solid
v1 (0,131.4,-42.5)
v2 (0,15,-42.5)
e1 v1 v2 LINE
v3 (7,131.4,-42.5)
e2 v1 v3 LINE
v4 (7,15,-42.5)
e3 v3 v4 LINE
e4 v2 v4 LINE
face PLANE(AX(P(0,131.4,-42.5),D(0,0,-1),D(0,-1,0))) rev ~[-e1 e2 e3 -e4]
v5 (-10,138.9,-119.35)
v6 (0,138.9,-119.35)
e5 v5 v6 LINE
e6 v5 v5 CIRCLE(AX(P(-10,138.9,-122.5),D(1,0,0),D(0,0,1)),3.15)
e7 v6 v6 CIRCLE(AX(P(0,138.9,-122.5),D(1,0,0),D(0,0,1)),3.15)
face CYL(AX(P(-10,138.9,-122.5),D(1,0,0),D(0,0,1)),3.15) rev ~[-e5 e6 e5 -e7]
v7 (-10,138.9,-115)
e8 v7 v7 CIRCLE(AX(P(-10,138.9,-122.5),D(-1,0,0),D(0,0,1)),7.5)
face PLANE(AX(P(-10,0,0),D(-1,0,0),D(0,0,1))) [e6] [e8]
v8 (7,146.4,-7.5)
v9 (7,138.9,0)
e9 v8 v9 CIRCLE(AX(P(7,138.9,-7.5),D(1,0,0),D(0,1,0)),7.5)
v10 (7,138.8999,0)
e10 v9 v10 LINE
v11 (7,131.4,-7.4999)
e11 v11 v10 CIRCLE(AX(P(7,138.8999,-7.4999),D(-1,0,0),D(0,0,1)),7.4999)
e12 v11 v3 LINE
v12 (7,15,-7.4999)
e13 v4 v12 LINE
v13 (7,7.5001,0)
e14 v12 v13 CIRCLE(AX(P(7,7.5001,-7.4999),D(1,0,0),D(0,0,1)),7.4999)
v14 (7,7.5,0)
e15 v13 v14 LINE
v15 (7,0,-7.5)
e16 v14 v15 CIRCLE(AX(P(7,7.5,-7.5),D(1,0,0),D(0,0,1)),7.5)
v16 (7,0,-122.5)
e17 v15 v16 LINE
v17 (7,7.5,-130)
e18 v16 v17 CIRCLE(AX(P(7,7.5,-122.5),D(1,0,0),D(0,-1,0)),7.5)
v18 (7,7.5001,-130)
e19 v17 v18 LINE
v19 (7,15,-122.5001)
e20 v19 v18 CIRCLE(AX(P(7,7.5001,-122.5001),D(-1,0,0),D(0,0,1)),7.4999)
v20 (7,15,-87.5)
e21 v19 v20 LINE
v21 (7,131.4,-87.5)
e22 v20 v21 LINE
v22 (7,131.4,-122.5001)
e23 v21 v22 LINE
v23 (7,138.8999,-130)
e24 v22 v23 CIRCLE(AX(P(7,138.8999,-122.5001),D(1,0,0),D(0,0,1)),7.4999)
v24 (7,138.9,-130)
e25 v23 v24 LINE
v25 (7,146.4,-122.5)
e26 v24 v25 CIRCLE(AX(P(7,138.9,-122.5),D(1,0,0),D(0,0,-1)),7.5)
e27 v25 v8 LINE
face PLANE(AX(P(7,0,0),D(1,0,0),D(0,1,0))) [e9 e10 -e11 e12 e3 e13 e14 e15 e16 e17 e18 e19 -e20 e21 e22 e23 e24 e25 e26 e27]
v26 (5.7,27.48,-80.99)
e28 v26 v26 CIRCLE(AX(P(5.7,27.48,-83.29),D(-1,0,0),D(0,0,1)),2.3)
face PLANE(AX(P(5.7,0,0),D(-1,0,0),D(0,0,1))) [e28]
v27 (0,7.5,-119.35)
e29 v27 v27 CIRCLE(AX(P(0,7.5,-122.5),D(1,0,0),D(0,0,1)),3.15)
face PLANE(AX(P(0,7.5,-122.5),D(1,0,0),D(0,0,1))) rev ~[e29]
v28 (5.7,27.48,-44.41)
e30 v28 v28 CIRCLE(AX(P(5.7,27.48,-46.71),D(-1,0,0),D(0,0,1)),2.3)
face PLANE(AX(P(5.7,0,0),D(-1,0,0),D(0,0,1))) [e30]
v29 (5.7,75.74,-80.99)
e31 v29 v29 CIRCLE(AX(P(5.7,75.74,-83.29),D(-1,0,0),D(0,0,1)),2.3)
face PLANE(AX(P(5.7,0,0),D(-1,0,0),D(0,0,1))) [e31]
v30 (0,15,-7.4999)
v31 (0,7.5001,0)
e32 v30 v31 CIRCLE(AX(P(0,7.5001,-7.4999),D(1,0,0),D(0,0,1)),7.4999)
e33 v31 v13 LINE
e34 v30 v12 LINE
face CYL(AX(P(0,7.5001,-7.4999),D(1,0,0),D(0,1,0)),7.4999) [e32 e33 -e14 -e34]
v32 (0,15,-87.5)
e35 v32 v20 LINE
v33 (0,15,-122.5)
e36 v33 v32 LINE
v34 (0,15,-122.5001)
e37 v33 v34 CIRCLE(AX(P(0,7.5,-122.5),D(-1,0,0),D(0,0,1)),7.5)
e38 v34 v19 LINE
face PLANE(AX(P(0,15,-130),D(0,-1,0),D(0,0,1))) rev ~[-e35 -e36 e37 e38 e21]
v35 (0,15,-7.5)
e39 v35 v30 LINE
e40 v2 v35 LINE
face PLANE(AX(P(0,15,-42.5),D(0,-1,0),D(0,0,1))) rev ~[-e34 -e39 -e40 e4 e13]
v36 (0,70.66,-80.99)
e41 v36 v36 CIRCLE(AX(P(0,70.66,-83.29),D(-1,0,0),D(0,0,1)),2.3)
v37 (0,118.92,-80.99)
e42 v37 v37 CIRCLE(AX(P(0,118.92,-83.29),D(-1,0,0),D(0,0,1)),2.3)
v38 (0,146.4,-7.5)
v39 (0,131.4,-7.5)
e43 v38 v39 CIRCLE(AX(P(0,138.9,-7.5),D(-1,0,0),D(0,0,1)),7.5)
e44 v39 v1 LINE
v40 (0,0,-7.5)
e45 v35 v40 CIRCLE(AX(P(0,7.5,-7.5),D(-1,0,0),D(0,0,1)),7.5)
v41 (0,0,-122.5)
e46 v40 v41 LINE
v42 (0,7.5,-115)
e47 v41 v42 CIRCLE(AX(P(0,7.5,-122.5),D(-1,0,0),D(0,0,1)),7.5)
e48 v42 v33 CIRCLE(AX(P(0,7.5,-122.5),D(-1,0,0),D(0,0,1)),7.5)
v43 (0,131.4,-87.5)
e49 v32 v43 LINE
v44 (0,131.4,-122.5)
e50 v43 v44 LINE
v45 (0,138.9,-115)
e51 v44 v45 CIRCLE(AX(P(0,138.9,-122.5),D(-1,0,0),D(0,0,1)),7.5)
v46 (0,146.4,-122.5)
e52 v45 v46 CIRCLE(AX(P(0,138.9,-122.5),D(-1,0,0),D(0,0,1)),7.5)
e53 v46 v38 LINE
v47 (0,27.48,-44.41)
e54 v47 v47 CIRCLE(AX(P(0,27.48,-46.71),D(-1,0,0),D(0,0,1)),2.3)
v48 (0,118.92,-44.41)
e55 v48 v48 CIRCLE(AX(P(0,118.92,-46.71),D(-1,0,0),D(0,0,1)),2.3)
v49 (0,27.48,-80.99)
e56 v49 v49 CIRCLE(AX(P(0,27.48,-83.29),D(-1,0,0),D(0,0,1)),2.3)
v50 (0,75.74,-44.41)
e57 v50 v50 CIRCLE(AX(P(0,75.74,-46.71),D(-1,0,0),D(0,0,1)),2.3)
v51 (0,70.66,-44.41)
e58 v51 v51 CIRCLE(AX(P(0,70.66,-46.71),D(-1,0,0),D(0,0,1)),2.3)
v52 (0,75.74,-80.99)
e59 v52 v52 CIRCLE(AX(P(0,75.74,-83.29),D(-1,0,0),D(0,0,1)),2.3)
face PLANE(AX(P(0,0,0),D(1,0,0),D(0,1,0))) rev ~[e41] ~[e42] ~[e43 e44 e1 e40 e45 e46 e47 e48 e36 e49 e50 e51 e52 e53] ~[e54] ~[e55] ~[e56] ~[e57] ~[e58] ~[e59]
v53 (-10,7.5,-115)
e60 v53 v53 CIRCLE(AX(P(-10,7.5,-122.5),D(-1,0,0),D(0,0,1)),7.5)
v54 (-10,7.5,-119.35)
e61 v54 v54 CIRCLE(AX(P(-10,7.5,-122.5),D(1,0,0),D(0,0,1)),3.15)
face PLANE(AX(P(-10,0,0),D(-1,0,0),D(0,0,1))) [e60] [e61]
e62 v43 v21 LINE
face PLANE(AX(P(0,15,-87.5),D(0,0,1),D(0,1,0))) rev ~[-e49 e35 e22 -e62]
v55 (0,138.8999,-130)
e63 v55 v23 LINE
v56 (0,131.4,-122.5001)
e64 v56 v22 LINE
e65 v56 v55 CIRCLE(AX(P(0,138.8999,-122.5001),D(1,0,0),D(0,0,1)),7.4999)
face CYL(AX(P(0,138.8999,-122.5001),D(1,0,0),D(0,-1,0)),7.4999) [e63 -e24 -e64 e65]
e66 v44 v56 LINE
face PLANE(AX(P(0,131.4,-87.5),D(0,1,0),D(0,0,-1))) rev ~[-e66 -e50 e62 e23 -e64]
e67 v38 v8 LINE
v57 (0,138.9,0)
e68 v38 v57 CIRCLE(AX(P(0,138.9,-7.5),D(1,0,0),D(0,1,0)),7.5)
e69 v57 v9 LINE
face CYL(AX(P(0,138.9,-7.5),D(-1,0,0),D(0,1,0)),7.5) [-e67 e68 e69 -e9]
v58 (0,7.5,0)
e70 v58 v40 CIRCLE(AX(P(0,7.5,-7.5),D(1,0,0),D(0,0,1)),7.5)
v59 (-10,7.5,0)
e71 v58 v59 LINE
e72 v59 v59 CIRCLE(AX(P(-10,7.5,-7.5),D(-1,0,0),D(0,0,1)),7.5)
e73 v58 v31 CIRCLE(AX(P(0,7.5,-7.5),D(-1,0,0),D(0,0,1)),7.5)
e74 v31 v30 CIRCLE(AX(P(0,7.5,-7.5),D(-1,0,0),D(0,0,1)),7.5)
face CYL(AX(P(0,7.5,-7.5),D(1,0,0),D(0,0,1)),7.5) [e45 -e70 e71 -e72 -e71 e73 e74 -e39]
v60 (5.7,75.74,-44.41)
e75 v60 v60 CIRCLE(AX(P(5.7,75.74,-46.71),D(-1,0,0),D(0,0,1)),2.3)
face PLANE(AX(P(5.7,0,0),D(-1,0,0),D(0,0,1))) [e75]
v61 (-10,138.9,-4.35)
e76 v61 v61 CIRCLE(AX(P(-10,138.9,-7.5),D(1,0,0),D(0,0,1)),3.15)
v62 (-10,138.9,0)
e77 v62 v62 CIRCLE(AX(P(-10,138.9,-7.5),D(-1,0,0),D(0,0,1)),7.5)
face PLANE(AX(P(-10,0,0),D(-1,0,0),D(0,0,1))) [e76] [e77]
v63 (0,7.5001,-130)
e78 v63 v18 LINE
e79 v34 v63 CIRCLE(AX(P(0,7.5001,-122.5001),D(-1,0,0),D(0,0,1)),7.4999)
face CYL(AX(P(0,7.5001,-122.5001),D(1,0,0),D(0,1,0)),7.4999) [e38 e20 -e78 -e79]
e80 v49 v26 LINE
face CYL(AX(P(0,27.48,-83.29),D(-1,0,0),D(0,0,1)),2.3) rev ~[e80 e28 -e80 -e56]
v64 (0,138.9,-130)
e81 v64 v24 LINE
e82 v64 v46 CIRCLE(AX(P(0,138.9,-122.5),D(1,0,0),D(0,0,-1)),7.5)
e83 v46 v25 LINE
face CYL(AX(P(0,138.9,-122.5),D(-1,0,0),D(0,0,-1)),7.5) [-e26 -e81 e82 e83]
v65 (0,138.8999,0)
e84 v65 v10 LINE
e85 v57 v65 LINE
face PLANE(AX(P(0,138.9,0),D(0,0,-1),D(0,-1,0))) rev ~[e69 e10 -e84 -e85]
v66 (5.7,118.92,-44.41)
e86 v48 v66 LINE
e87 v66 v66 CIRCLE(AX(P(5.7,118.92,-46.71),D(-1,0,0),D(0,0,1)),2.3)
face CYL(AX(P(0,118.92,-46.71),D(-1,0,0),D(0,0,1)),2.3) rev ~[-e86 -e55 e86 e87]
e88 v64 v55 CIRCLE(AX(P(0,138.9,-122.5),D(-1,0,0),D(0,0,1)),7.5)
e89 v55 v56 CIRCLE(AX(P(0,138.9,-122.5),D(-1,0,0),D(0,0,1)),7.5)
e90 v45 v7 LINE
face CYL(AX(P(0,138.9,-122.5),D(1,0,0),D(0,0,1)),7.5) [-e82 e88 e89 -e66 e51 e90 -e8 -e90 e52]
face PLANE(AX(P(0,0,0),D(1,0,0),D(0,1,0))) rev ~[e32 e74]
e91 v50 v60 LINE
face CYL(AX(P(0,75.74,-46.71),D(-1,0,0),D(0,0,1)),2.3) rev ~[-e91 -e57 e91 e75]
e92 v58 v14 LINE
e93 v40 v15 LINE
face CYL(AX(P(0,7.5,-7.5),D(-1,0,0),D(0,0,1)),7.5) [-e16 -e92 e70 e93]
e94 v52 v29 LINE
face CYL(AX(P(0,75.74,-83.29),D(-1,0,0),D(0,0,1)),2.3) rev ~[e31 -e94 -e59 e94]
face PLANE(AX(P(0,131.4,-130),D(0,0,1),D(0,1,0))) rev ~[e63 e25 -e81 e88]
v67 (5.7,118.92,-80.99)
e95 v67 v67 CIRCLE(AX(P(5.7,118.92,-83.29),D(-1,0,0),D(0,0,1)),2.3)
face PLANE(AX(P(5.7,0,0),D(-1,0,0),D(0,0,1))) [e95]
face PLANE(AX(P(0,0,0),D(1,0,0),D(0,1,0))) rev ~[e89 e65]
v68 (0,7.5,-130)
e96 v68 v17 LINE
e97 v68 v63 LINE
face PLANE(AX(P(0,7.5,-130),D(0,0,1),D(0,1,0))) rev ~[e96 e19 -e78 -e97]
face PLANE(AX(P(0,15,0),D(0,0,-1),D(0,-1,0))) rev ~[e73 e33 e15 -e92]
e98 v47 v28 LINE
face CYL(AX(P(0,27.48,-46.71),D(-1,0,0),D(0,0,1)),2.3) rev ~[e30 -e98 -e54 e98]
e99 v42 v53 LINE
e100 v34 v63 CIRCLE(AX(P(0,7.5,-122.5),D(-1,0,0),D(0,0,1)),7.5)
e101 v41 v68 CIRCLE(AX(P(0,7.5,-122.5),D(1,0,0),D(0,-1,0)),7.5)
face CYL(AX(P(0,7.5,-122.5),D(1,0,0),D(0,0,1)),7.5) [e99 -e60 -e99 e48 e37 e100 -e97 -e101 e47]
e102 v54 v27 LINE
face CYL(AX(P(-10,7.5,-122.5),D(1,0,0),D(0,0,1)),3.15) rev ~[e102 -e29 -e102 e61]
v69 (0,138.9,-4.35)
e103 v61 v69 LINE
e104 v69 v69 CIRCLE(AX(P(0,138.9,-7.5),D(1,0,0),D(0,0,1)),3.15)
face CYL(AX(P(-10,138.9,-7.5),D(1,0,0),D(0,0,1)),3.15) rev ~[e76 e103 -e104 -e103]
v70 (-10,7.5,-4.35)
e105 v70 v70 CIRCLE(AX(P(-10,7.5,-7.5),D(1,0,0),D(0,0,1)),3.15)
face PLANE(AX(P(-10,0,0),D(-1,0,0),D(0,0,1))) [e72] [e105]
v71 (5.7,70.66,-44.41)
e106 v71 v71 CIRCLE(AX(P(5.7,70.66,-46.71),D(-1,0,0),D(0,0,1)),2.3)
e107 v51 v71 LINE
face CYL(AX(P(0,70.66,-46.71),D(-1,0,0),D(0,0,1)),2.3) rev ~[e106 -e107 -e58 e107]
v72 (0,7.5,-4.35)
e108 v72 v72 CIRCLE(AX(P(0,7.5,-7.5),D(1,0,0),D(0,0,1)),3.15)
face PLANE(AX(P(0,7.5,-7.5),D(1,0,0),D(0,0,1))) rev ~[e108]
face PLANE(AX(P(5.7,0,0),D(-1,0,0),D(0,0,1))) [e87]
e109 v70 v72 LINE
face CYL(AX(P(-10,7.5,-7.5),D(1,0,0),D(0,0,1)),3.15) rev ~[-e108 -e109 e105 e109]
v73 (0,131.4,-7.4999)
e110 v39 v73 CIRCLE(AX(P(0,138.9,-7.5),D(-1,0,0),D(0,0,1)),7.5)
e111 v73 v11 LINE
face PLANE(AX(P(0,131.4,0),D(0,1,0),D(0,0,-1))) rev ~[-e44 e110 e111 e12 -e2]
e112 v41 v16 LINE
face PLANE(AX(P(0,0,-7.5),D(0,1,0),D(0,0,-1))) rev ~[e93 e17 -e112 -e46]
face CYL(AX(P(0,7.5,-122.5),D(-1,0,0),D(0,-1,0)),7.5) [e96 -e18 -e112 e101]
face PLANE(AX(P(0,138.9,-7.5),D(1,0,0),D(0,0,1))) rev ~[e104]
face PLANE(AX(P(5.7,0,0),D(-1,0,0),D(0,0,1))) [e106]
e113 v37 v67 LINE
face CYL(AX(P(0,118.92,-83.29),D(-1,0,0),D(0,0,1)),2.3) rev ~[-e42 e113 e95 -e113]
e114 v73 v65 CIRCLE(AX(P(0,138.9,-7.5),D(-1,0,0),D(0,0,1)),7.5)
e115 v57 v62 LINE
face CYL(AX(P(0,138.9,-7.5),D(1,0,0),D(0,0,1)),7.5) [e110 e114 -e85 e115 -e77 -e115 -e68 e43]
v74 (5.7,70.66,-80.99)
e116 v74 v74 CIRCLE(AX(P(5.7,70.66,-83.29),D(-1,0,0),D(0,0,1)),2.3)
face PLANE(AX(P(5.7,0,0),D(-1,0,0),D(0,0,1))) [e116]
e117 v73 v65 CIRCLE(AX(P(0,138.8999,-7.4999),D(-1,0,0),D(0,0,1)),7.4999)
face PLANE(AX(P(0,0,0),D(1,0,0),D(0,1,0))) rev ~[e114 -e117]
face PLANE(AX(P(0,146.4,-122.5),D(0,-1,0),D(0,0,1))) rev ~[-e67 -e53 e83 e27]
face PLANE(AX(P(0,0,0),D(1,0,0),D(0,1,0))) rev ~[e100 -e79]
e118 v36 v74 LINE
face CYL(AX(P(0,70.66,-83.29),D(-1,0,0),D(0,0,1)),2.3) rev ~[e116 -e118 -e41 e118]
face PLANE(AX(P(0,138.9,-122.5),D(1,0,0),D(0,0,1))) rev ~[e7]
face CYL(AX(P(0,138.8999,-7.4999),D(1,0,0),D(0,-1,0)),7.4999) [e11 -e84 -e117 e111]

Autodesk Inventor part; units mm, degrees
ref_plane "YZ Plane" through (0, 0, 0) normal (1, 0, 0) x (0, 1, 0)
ref_plane "XZ Plane" through (0, 0, 0) normal (0, 1, 0) x (-1, 0, 0)
ref_plane "XY Plane" through (0, 0, 0) normal (0, 0, 1) x (1, 0, 0)
sketch "Esquisse1" plane through (0, 0, 0) normal (1, 0, 0) x (0, 1, 0)
  line L0 (7.5, 0) -> (138.9, 0)
  line L1 (146.4, -7.5) -> (146.4, -122.5)
  line L2 (138.9, -130) -> (7.5, -130)
  line L3 (0, -122.5) -> (0, -7.5)
  arc A0 (138.9, -130) -> (146.4, -122.5) centre (138.9, -122.5) ccw
  arc A1 (0, -122.5) -> (7.5, -130) centre (7.5, -122.5) ccw
  arc A2 (7.5, 0) -> (0, -7.5) centre (7.5, -7.5) ccw
  arc A3 (146.4, -7.5) -> (138.9, 0) centre (138.9, -7.5) ccw
  line L4 (15, -42.5) -> (131.4, -42.5)
  line L5 (131.4, -42.5) -> (131.4, -87.5)
  line L6 (131.4, -87.5) -> (15, -87.5)
  line L7 (15, -87.5) -> (15, -42.5)
  circle A4 centre (138.9, -122.5) radius 7.5
  line L8 (15, -42.5) -> (15, 0)
  line L9 (15, -87.5) -> (15, -130)
  line L10 (131.4, -87.5) -> (131.4, -130)
  line L11 (131.4, -42.5) -> (131.4, 0)
  circle A5 centre (7.5, -122.5) radius 7.5
  circle A6 centre (138.9, -7.5) radius 7.5
  circle A7 centre (7.5, -7.5) radius 7.5
  point P0 (0, 0)
  point P1 (146.4, -130)
  point P2 (146.4, 0)
  point P3 (0, -130)
  point P4 (73.2, -87.5)
  dimension "d0" = 146.4
  dimension "d1" = 130
  dimension "d2" = 7.5
  dimension "d3" = 7.5
  dimension "d4" = 116.4
  dimension "d5" = 45
  dimension "d11" = 42.5
  dimension "d12" = 42.5
  dimension "d13" = 15
  dimension "d104" = 131.4
  dimension "d107" = 115
sketch "Esquisse1 outline for Extrusion1" plane through (0, 0, 0) normal (1, 0, 0) x (0, 1, 0)
  line L0 (15, -87.5) -> (131.4, -87.5)
  line L1 (15, -130) -> (15, -87.5)
  line L2 (7.5, -130) -> (15, -130)
  arc A0 (0, -122.5) -> (7.5, -130) centre (7.5, -122.5) ccw
  line L3 (0, -7.5) -> (0, -122.5)
  arc A1 (7.5, 0) -> (0, -7.5) centre (7.5, -7.5) ccw
  line L4 (15, 0) -> (7.5, 0)
  line L5 (15, -42.5) -> (15, 0)
  line L6 (131.4, -42.5) -> (15, -42.5)
  line L7 (131.4, 0) -> (131.4, -42.5)
  line L8 (138.9, 0) -> (131.4, 0)
  arc A2 (146.4, -7.5) -> (138.9, 0) centre (138.9, -7.5) ccw
  line L9 (146.4, -122.5) -> (146.4, -7.5)
  arc A3 (138.9, -130) -> (146.4, -122.5) centre (138.9, -122.5) ccw
  line L10 (131.4, -130) -> (138.9, -130)
  line L11 (131.4, -87.5) -> (131.4, -130)
extrude "Extrusion1" add sketch "Esquisse1 outline for Extrusion1" along normal blind 7
sketch "Esquisse2" plane through (0, 0, 0) normal (-1, 0, 0) x (0, 0, 1)
  line L0 (-46.71, 27.48) -> (-83.29, 27.48)
  line L1 (-83.29, 27.48) -> (-83.29, 70.66)
  line L2 (-83.29, 70.66) -> (-46.71, 70.66)
  line L3 (-46.71, 70.66) -> (-46.71, 27.48)
  line L4 (-46.71, 75.74) -> (-83.29, 75.74)
  line L5 (-83.29, 75.74) -> (-83.29, 118.92)
  line L6 (-83.29, 118.92) -> (-46.71, 118.92)
  line L7 (-46.71, 118.92) -> (-46.71, 75.74)
  line L8 (-42.5, 131.4) -> (-42.5, 15) projected
  line L9 (-87.5, 15) -> (-87.5, 131.4) projected
  circle A0 centre (-83.29, 27.48) radius 2.3
  circle A1 centre (-46.71, 27.48) radius 2.3
  circle A2 centre (-46.71, 70.66) radius 2.3
  circle A3 centre (-83.29, 70.66) radius 2.3
  circle A4 centre (-83.29, 75.74) radius 2.3
  circle A5 centre (-46.71, 75.74) radius 2.3
  circle A6 centre (-46.71, 118.92) radius 2.3
  circle A7 centre (-83.29, 118.92) radius 2.3
  line L10 (-7.5, 0) -> (-122.5, 0) projected
  line L11 (-122.5, 146.4) -> (-7.5, 146.4) projected
  point P0 (0, 0)
  point P1 (-83.29, 49.07)
  dimension "d8" = 36.58
  dimension "d9" = 43.18
  dimension "d10" = 43.18
  dimension "d14" = 4.21
  dimension "d15" = 4.21
  dimension "d16" = 5.08
  dimension "d17" = 4.6
  dimension "d18" = 4.6
  dimension "d19" = 4.6
  dimension "d20" = 4.6
  dimension "d21" = 4.6
  dimension "d22" = 4.6
  dimension "d23" = 4.6
  dimension "d24" = 4.6
  dimension "d110" = 27.48
  dimension "d111" = 27.48
sketch "Esquisse2 outline for Extrusion2" plane through (0, 0, 0) normal (-1, 0, 0) x (0, 0, 1)
  circle A0 centre (-46.71, 118.92) radius 2.3
  circle A1 centre (-83.29, 118.92) radius 2.3
  circle A2 centre (-83.29, 75.74) radius 2.3
  circle A3 centre (-46.71, 75.74) radius 2.3
  circle A4 centre (-83.29, 70.66) radius 2.3
  circle A5 centre (-46.71, 70.66) radius 2.3
  circle A6 centre (-46.71, 27.48) radius 2.3
  circle A7 centre (-83.29, 27.48) radius 2.3
extrude "Extrusion2" cut sketch "Esquisse2 outline for Extrusion2" against normal blind 5.7
sketch "Esquisse3" plane through (0, 0, 0) normal (-1, 0, 0) x (0, 0, 1)
  arc A0 (-7.5, 0) -> (0, 7.5) centre (-7.5, 7.5) ccw projected
  circle A1 centre (-7.5, 7.5) radius 7.5
  arc A2 (-130, 7.5) -> (-122.5, 0) centre (-122.5, 7.5) ccw projected
  circle A3 centre (-122.5, 7.5) radius 7.5
  arc A4 (-122.5, 146.4) -> (-130, 138.9) centre (-122.5, 138.9) ccw projected
  circle A5 centre (-122.5, 138.9) radius 7.5
  arc A6 (0, 138.9) -> (-7.5, 146.4) centre (-7.5, 138.9) ccw projected
  circle A7 centre (-7.5, 138.9) radius 7.5
  point P0 (0, 0)
  point P1 (-7.5, 0)
  point P2 (-7.5, 146.4)
  point P3 (-130, 7.5)
sketch "Esquisse3 outline for Extrusion3" plane through (0, 0, 0) normal (-1, 0, 0) x (0, 0, 1)
  circle A0 centre (-7.5, 7.5) radius 7.5
  circle A1 centre (-7.5, 138.9) radius 7.5
  circle A2 centre (-122.5, 7.5) radius 7.5
  circle A3 centre (-122.5, 138.9) radius 7.5
extrude "Extrusion3" add sketch "Esquisse3 outline for Extrusion3" along normal blind 10
fillet "Congé1" radius 7.5 4 edges at (3.5, 131.4, 0) (3.5, 15, 0) (3.5, 131.4, -130) (3.5, 15, -130)
hole "Perçage5" at (-10, 7.5, -7.5) direction (1, 0, 0) diameter 6.3 depth 10
hole "Perçage6" at (-10, 138.9, -7.5) direction (1, 0, 0) diameter 6.3 depth 10
hole "Perçage7" at (-10, 138.9, -122.5) direction (1, 0, 0) diameter 6.3 depth 10
hole "Perçage8" at (-10, 7.5, -122.5) direction (1, 0, 0) diameter 6.3 depth 10
properties part number "base"
